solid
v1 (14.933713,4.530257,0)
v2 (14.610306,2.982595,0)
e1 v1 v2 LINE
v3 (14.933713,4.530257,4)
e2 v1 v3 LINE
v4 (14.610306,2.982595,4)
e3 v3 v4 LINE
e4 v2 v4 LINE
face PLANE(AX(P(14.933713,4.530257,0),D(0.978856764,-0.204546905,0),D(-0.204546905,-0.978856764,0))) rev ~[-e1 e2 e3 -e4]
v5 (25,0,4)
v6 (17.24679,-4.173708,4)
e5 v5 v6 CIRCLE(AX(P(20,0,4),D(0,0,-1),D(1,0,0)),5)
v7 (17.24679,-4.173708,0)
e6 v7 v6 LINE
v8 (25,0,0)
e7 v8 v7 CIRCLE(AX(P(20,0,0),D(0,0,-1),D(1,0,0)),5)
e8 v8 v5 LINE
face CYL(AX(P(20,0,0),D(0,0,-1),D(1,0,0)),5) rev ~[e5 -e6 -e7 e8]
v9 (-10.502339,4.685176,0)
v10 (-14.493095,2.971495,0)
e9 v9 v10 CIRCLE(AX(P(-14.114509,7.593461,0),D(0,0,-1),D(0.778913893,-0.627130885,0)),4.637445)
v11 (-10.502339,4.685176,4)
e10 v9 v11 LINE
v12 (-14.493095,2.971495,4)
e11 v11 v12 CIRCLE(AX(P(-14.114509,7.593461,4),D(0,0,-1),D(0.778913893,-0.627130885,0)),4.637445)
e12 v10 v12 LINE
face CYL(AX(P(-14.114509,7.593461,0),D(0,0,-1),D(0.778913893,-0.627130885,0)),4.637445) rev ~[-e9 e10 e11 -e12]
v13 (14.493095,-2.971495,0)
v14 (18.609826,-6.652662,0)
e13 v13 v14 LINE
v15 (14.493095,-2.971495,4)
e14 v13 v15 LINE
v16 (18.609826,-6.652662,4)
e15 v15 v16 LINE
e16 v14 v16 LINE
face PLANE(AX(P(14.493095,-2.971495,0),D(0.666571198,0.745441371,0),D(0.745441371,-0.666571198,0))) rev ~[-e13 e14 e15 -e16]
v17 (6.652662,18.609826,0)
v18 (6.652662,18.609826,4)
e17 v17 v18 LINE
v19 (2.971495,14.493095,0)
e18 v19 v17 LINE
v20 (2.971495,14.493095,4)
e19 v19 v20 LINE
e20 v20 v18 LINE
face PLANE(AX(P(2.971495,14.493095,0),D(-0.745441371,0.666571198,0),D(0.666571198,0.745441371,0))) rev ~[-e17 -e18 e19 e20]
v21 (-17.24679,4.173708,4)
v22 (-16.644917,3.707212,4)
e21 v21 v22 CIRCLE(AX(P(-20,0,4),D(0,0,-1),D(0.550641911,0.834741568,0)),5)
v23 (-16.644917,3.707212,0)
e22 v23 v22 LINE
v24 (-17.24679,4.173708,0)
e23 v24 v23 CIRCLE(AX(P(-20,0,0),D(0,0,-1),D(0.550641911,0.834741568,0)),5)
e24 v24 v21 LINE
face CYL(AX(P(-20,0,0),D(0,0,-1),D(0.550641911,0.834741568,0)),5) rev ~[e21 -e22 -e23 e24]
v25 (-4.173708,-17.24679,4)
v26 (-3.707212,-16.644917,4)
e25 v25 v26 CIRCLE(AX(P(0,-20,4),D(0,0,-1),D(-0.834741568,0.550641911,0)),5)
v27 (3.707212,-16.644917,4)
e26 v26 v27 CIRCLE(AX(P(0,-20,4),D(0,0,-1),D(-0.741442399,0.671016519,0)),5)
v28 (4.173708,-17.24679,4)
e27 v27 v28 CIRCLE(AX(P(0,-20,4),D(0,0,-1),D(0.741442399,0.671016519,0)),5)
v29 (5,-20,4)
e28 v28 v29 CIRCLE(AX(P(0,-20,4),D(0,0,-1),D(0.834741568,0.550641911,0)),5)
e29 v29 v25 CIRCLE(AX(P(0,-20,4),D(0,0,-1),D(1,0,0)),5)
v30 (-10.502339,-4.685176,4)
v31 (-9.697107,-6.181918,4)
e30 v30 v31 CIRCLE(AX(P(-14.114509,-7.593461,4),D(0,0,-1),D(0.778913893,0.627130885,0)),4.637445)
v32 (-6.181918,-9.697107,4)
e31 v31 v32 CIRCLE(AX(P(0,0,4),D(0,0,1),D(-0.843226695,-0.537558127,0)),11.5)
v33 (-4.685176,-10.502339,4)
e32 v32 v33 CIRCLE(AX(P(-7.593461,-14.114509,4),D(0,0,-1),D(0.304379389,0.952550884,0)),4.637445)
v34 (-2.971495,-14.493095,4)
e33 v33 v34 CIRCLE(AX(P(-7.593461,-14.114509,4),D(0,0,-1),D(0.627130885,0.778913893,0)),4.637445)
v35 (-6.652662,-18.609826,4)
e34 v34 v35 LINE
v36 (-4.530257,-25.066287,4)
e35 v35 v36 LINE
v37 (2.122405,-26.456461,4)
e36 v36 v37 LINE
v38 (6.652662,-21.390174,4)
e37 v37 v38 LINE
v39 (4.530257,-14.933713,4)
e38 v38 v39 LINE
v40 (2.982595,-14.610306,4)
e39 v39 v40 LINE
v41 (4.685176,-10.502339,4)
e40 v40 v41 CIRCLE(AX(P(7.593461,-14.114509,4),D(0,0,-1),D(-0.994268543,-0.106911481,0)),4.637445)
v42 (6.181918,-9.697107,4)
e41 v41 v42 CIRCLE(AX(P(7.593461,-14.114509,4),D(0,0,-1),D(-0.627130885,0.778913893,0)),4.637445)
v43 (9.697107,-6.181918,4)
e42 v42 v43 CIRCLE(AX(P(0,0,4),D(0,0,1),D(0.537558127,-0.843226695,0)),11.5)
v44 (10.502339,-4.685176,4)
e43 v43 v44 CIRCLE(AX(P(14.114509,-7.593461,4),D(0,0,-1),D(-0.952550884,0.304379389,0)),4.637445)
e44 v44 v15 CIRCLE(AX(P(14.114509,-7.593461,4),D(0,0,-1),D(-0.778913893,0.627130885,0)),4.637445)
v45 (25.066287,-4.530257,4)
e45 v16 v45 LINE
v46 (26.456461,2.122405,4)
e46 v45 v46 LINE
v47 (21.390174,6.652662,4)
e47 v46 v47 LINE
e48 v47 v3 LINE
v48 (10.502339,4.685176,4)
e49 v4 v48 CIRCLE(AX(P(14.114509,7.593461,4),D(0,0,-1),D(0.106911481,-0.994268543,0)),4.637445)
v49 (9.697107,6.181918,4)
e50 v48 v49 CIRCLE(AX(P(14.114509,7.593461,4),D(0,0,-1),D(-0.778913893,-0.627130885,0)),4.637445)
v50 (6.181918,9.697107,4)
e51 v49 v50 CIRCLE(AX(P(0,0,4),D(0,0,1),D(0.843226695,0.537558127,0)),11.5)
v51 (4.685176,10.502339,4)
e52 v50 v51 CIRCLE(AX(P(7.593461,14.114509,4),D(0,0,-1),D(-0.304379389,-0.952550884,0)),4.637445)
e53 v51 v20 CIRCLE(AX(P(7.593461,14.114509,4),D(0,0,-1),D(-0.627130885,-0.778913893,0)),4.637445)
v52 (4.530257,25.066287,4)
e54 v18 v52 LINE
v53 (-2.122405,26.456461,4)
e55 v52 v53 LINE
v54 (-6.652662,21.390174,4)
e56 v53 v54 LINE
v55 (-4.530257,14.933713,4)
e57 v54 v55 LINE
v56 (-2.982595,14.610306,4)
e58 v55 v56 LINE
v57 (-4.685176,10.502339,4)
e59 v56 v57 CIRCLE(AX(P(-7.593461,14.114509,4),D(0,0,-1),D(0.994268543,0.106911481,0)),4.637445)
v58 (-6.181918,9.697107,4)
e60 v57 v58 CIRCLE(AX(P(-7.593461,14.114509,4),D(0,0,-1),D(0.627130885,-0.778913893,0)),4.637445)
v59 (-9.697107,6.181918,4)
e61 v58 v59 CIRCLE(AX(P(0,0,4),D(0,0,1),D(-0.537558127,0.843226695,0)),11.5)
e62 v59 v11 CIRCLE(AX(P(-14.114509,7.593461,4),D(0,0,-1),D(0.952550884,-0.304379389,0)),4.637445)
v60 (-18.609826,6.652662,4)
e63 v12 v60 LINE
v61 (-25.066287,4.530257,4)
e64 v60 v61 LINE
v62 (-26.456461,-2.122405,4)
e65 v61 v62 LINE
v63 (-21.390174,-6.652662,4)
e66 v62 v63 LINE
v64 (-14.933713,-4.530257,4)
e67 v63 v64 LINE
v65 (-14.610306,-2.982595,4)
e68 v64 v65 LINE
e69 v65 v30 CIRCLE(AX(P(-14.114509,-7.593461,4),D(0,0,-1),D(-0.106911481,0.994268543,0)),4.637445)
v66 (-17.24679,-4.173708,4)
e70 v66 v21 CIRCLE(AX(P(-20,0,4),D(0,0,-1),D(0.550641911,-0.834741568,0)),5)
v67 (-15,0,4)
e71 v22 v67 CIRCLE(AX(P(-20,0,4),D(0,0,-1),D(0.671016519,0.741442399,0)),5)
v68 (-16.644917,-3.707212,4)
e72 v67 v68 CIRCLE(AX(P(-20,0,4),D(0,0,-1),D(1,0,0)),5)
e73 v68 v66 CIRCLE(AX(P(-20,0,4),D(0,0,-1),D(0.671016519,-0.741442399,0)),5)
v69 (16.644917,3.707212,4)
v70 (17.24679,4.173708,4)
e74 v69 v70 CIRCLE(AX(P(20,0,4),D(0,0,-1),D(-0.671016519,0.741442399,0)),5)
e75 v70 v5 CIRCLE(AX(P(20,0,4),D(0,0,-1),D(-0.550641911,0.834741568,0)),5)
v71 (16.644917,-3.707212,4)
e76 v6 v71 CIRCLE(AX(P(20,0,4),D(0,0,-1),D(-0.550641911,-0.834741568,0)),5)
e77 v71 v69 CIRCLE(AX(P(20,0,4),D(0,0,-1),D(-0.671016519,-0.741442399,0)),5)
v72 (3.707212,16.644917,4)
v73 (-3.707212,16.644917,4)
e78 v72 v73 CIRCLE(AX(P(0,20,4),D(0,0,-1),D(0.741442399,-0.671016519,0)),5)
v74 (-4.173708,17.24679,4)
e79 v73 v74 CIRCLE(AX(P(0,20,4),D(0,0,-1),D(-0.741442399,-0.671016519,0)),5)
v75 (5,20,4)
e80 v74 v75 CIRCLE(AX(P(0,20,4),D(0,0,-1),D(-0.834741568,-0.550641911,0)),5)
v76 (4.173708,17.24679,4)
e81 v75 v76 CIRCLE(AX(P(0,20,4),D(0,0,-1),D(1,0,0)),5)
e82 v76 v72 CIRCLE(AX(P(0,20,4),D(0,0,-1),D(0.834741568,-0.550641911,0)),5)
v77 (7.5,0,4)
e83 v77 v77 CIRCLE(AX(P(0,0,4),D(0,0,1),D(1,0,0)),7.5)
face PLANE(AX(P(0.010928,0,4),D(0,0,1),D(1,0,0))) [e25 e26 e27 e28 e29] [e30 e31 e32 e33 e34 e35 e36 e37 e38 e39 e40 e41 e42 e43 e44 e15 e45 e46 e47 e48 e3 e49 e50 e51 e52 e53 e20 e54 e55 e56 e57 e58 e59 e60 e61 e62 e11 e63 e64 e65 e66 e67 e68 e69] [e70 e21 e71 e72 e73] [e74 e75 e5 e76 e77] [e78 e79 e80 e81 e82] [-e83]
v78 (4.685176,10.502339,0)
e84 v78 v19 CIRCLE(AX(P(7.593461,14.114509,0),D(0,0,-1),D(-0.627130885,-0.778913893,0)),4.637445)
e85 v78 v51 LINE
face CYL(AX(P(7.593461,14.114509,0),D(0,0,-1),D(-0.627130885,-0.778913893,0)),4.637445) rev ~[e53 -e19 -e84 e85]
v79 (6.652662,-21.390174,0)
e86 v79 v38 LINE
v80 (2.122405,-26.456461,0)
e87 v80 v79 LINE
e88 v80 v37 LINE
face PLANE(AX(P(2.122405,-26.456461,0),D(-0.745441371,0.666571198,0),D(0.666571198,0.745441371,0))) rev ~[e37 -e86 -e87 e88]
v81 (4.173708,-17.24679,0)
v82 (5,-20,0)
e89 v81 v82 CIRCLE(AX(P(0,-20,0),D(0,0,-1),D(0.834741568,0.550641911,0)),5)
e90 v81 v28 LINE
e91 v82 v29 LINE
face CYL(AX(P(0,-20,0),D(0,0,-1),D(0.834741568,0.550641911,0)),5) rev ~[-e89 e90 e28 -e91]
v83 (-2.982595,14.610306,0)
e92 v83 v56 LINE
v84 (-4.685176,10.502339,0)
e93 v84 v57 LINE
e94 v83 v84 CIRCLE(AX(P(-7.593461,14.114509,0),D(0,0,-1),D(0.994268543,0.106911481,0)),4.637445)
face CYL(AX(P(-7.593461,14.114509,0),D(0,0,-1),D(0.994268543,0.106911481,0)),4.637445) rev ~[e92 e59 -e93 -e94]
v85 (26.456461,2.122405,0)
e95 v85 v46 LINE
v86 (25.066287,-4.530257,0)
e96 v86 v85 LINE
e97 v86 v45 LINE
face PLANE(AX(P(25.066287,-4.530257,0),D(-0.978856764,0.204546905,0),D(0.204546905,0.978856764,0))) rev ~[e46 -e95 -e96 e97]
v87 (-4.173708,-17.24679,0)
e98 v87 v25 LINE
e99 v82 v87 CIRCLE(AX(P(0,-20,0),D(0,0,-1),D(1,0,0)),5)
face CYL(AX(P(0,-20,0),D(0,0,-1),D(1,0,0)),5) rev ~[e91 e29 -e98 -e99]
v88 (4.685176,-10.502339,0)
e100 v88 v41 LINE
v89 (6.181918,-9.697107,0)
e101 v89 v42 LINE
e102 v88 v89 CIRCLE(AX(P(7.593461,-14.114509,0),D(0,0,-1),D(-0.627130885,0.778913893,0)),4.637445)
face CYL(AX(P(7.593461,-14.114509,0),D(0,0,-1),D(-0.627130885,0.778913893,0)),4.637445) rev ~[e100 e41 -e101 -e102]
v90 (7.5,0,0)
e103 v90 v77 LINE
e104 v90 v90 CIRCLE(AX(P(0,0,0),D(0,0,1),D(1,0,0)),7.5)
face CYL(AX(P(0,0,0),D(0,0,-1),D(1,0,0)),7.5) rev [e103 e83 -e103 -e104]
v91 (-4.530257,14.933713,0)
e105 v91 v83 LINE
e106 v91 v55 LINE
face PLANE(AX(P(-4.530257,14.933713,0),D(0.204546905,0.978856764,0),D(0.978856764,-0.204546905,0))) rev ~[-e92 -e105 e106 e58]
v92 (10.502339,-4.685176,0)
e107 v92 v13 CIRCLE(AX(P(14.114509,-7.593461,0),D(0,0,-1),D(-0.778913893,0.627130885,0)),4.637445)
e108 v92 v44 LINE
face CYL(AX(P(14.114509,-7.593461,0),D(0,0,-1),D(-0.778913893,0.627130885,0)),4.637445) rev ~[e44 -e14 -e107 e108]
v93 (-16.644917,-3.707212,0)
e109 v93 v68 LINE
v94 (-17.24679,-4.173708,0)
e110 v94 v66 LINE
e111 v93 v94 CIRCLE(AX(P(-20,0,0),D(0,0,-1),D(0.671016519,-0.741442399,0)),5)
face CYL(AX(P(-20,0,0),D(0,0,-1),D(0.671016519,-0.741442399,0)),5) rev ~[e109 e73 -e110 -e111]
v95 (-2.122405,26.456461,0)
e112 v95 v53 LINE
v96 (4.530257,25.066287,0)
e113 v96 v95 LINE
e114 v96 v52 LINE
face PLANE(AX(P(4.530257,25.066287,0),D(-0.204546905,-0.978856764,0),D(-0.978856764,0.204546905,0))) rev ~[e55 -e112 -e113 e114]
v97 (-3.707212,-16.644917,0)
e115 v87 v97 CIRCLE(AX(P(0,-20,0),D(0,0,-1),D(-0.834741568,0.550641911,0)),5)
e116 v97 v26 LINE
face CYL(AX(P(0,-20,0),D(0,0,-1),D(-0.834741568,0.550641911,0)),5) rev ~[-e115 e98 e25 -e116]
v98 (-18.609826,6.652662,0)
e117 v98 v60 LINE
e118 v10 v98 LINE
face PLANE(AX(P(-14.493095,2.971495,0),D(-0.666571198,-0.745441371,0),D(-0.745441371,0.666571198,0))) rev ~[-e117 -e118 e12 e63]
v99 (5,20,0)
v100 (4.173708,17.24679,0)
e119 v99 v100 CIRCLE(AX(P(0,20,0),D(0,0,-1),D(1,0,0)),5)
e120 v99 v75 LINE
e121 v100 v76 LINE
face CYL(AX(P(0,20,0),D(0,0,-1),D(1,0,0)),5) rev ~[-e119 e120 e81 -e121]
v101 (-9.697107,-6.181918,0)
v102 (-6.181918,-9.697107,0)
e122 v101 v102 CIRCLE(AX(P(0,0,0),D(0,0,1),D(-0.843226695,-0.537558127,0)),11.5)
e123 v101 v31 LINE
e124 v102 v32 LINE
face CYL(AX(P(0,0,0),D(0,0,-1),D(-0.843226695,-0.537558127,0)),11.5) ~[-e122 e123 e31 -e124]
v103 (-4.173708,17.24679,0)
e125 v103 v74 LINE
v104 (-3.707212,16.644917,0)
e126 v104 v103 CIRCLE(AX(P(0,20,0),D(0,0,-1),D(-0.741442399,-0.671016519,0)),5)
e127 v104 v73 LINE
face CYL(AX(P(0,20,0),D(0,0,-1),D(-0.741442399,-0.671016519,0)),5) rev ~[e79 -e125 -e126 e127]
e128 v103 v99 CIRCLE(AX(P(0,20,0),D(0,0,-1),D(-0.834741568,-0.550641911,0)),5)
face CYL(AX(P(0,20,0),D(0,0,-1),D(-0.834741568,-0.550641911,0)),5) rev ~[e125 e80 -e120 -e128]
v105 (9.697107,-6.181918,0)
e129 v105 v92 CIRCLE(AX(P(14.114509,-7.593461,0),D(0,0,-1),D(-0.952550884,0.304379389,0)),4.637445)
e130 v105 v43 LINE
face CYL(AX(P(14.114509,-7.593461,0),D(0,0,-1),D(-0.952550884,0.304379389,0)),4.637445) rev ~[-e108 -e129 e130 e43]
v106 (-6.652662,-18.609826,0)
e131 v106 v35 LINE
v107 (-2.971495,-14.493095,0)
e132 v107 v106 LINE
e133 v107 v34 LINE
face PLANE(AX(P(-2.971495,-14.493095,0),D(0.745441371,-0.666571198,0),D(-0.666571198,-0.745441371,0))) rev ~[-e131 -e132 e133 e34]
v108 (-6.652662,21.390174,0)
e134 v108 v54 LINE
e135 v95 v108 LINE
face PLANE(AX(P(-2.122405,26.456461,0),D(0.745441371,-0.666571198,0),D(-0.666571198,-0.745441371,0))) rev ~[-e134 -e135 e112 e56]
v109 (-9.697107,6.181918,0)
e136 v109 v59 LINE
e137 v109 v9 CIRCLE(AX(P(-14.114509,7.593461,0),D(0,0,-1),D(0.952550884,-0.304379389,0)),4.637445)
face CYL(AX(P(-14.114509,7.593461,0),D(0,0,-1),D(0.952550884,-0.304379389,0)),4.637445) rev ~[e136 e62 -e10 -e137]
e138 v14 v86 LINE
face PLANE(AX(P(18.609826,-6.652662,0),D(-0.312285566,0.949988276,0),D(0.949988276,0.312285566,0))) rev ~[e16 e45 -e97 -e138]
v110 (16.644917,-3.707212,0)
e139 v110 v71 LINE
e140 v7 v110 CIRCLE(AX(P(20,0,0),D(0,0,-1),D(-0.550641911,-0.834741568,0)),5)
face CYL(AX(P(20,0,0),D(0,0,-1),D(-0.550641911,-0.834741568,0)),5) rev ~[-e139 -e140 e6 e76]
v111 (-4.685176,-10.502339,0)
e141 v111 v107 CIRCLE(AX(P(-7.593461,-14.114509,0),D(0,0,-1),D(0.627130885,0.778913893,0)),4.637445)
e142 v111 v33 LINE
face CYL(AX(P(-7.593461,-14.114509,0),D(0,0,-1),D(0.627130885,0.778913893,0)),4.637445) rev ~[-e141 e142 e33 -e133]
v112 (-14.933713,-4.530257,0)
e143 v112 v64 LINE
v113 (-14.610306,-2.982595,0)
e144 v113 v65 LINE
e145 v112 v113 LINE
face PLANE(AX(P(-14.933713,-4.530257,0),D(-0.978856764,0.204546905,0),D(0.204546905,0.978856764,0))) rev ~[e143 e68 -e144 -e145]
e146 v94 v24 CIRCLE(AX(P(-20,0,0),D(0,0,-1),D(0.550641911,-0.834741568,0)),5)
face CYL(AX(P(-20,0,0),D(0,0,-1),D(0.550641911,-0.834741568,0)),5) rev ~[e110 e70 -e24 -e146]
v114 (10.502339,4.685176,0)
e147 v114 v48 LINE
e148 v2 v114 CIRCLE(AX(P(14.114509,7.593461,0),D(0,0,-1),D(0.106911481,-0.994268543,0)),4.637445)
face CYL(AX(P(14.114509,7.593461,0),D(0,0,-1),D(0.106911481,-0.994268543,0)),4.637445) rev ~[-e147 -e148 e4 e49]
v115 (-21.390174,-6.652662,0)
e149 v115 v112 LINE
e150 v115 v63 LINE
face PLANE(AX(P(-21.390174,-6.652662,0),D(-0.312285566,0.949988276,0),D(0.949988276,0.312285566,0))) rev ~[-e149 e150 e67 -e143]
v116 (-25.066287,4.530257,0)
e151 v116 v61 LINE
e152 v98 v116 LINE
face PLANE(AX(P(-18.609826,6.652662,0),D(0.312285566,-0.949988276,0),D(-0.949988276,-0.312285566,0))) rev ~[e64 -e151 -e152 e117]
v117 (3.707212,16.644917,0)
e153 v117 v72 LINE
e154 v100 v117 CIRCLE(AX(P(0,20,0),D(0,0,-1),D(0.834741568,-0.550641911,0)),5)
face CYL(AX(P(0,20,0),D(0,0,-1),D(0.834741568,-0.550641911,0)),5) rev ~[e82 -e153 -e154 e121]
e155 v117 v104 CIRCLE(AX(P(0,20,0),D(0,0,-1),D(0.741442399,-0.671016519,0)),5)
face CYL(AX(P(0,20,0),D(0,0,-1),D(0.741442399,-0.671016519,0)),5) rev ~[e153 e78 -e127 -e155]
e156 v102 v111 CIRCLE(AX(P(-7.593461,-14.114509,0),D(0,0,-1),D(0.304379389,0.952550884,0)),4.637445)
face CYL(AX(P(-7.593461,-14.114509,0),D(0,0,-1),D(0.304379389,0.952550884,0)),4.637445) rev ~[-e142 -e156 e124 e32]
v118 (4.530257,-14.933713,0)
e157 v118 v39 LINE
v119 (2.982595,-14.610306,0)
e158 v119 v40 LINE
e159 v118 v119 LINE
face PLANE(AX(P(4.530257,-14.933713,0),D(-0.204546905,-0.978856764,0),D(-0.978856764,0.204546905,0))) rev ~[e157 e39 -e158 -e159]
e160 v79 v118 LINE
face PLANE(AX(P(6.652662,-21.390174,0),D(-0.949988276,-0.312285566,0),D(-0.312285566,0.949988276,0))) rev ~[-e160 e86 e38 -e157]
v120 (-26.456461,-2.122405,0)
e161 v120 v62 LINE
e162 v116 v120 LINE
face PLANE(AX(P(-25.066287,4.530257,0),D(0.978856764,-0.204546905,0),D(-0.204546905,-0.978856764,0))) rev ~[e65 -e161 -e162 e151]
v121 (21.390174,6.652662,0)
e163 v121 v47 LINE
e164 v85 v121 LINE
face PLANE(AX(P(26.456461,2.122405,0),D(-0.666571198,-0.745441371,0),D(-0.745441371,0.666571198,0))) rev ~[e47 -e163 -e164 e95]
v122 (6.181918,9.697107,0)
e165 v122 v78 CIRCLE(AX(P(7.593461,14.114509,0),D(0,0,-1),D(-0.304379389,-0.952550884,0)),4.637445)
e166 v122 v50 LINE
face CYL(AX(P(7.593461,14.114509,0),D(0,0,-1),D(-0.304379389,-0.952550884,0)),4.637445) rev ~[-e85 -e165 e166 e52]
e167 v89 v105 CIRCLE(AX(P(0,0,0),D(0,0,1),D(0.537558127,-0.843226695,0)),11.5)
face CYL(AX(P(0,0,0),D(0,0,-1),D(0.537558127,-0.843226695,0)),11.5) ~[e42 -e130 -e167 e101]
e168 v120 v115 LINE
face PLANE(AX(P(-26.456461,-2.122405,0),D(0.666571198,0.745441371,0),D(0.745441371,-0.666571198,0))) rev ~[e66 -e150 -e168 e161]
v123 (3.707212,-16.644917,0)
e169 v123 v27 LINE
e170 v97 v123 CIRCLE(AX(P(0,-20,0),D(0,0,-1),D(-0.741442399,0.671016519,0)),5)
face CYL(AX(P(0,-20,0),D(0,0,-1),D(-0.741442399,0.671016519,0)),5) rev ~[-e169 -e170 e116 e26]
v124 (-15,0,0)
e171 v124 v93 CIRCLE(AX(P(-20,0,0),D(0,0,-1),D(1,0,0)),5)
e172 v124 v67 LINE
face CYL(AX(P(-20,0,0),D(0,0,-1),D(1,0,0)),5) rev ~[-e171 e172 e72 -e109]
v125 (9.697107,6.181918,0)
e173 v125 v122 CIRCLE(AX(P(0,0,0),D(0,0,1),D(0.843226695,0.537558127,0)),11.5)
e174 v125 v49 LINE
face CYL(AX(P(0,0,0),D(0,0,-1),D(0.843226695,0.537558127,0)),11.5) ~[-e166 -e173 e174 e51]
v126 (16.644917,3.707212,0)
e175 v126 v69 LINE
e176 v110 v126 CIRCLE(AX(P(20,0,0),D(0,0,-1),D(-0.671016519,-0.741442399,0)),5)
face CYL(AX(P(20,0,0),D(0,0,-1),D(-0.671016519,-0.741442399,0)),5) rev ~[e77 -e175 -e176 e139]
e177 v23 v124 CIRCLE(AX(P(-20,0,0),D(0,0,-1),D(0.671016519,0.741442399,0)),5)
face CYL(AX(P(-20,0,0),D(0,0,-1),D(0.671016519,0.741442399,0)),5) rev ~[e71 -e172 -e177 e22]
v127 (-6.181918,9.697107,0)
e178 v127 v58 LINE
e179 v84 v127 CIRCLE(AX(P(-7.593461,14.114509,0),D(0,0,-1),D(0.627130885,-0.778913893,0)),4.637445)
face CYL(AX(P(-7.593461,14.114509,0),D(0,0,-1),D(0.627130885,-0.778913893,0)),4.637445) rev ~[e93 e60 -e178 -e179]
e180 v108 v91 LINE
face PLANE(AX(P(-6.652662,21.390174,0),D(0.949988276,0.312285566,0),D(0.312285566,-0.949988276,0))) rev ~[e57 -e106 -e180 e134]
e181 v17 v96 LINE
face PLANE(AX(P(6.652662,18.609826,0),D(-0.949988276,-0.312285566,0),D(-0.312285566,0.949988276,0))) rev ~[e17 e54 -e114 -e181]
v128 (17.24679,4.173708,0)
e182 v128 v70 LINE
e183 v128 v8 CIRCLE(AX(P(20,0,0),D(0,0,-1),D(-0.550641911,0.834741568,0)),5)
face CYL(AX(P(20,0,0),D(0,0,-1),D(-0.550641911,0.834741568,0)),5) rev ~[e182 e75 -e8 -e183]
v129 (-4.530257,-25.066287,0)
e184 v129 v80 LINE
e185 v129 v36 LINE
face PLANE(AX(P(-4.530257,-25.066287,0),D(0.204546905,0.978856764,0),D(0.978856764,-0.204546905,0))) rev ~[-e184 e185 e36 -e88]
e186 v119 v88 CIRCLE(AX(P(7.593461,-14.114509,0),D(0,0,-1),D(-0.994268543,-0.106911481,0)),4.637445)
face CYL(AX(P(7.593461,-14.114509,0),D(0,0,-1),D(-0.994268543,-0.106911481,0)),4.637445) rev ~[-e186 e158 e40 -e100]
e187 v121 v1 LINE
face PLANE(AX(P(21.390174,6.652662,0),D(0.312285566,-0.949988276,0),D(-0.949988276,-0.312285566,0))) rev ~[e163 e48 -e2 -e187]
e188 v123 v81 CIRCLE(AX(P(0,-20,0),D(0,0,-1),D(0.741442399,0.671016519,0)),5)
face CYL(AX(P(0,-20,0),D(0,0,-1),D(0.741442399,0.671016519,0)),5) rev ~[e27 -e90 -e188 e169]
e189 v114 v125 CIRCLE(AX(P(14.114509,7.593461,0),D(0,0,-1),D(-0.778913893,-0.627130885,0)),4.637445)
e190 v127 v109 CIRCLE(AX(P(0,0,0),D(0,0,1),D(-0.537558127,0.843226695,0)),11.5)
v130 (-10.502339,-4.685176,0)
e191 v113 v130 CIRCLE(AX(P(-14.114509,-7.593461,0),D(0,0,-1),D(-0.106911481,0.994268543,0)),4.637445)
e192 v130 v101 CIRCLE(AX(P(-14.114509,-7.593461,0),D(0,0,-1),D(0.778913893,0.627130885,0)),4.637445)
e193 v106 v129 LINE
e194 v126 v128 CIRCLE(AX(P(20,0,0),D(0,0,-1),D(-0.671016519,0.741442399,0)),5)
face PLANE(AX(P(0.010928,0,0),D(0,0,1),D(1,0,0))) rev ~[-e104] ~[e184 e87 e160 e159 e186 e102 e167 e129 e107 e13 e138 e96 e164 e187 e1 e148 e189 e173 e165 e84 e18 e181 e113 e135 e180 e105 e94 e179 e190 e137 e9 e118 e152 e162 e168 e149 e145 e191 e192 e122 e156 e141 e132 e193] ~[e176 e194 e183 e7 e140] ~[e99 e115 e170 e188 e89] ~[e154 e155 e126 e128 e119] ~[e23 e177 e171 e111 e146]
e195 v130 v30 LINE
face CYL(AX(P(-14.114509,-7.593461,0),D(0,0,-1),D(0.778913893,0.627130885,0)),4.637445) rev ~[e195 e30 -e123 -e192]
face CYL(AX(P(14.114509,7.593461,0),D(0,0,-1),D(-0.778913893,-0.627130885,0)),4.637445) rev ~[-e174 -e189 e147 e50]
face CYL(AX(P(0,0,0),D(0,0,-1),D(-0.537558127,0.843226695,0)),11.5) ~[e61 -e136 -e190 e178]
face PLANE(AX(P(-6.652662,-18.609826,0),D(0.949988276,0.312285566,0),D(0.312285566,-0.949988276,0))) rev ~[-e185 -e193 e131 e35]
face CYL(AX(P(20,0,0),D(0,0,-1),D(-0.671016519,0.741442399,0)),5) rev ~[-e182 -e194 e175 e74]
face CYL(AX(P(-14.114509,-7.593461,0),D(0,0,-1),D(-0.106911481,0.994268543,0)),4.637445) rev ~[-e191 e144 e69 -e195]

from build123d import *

# Parameters (mm, degrees)
F0_R     = 7.5
F1_DEPTH = 4


with BuildPart() as f1:
    # F0 (on Top) → F1 (new body)
    with BuildSketch(Plane.XY):
        with BuildLine():
            ThreePointArc((10.5023390129, 4.6851761182), (10.0305689983, 5.3963431452), (9.6971069971, 6.1819184634))
            ThreePointArc((9.6971069971, 6.1819184634), (8.1317279836, 8.1317279836), (6.1819184634, 9.6971069971))
            ThreePointArc((6.1819184634, 9.6971069971), (5.3963431452, 10.0305689983), (4.6851761182, 10.5023390129))
            ThreePointArc((4.6851761182, 10.5023390129), (0, 11.5), (-4.6851761182, 10.5023390129))
            ThreePointArc((-4.6851761182, 10.5023390129), (-5.3963431452, 10.0305689983), (-6.1819184634, 9.6971069971))
            ThreePointArc((-6.1819184634, 9.6971069971), (-8.1317279836, 8.1317279836), (-9.6971069971, 6.1819184634))
            ThreePointArc((-9.6971069971, 6.1819184634), (-10.0305689983, 5.3963431452), (-10.5023390129, 4.6851761182))
            ThreePointArc((-10.5023390129, 4.6851761182), (-11.5, 0), (-10.5023390129, -4.6851761182))
            ThreePointArc((-10.5023390129, -4.6851761182), (-10.0305689983, -5.3963431452), (-9.6971069971, -6.1819184634))
            ThreePointArc((-9.6971069971, -6.1819184634), (-8.1317279836, -8.1317279836), (-6.1819184634, -9.6971069971))
            ThreePointArc((-6.1819184634, -9.6971069971), (-5.3963431452, -10.0305689983), (-4.6851761182, -10.5023390129))
            ThreePointArc((-4.6851761182, -10.5023390129), (0, -11.5), (4.6851761182, -10.5023390129))
            ThreePointArc((4.6851761182, -10.5023390129), (5.3963431452, -10.0305689983), (6.1819184634, -9.6971069971))
            ThreePointArc((6.1819184634, -9.6971069971), (8.1317279836, -8.1317279836), (9.6971069971, -6.1819184634))
            ThreePointArc((9.6971069971, -6.1819184634), (10.0305689983, -5.3963431452), (10.5023390129, -4.6851761182))
            ThreePointArc((10.5023390129, -4.6851761182), (11.2478197587, -2.3951097419), (11.5, 0))
            ThreePointArc((11.5, 0), (11.2478197587, 2.3951097419), (10.5023390129, 4.6851761182))
        make_face()
        Circle(F0_R, mode=Mode.SUBTRACT)
        with BuildLine():
            ThreePointArc((14.6103055623, 2.982595382), (12.338941223, 3.3093913031), (10.5023390129, 4.6851761182))
            ThreePointArc((10.5023390129, 4.6851761182), (11.2478197587, 2.3951097419), (11.5, 0))
            ThreePointArc((11.5, 0), (11.2478197587, -2.3951097419), (10.5023390129, -4.6851761182))
            ThreePointArc((10.5023390129, -4.6851761182), (12.2847026286, -3.3322754018), (14.4930952607, -2.9714951504))
            ThreePointArc((14.4930952607, -2.9714951504), (15.6148030882, -3.2054073782), (16.6449174053, -3.7072119959))
            ThreePointArc((16.6449174053, -3.7072119959), (15, 0), (16.6449174053, 3.7072119959))
            ThreePointArc((16.6449174053, 3.7072119959), (15.6703838257, 3.2248055408), (14.6103055623, 2.982595382))
        make_face()
        with BuildLine():
            ThreePointArc((-4.6851761182, 10.5023390129), (0, 11.5), (4.6851761182, 10.5023390129))
            ThreePointArc((4.6851761182, 10.5023390129), (3.3322754018, 12.2847026286), (2.9714951504, 14.4930952607))
            ThreePointArc((2.9714951504, 14.4930952607), (3.2054073782, 15.6148030882), (3.7072119959, 16.6449174053))
            ThreePointArc((3.7072119959, 16.6449174053), (0, 15), (-3.7072119959, 16.6449174053))
            ThreePointArc((-3.7072119959, 16.6449174053), (-3.2248055408, 15.6703838257), (-2.982595382, 14.6103055623))
            ThreePointArc((-2.982595382, 14.6103055623), (-3.3093913031, 12.338941223), (-4.6851761182, 10.5023390129))
        make_face()
        with BuildLine():
            Line((14.9337128596, 4.5302571293), (14.6103055623, 2.982595382))
            ThreePointArc((14.6103055623, 2.982595382), (15.6703838257, 3.2248055408), (16.6449174053, 3.7072119959))
            ThreePointArc((16.6449174053, 3.7072119959), (16.936960195, 3.9519346089), (17.2467904427, 4.17370784))
            ThreePointArc((17.2467904427, 4.17370784), (22.3700160562, 4.4026155741), (25, 0))
            ThreePointArc((25, 0), (22.3700160562, -4.4026155741), (17.2467904427, -4.17370784))
            ThreePointArc((17.2467904427, -4.17370784), (16.936960195, -3.9519346089), (16.6449174053, -3.7072119959))
            ThreePointArc((16.6449174053, -3.7072119959), (15.6148030882, -3.2054073782), (14.4930952607, -2.9714951504))
            Line((14.4930952607, -2.9714951504), (18.6098258106, -6.6526619311))
            Line((18.6098258106, -6.6526619311), (25.0662871404, -4.5302571293))
            Line((25.0662871404, -4.5302571293), (26.4564613299, 2.1224048018))
            Line((26.4564613299, 2.1224048018), (21.3901741894, 6.6526619311))
            Line((21.3901741894, 6.6526619311), (14.9337128596, 4.5302571293))
        make_face()
        with BuildLine():
            ThreePointArc((3.7072119959, 16.6449174053), (3.2054073782, 15.6148030882), (2.9714951504, 14.4930952607))
            Line((2.9714951504, 14.4930952607), (6.6526619311, 18.6098258106))
            Line((6.6526619311, 18.6098258106), (4.5302571293, 25.0662871404))
            Line((4.5302571293, 25.0662871404), (-2.1224048018, 26.4564613299))
            Line((-2.1224048018, 26.4564613299), (-6.6526619311, 21.3901741894))
            Line((-6.6526619311, 21.3901741894), (-4.5302571293, 14.9337128596))
            Line((-4.5302571293, 14.9337128596), (-2.982595382, 14.6103055623))
            ThreePointArc((-2.982595382, 14.6103055623), (-3.2248055408, 15.6703838257), (-3.7072119959, 16.6449174053))
            ThreePointArc((-3.7072119959, 16.6449174053), (-3.9519346089, 16.936960195), (-4.17370784, 17.2467904427))
            ThreePointArc((-4.17370784, 17.2467904427), (-1.4372649025, 24.7889737523), (5, 20))
            ThreePointArc((5, 20), (4.7889737523, 18.5627350975), (4.17370784, 17.2467904427))
            ThreePointArc((4.17370784, 17.2467904427), (3.9519346089, 16.936960195), (3.7072119959, 16.6449174053))
        make_face()
        with BuildLine():
            ThreePointArc((-10.5023390129, -4.6851761182), (-11.5, 0), (-10.5023390129, 4.6851761182))
            ThreePointArc((-10.5023390129, 4.6851761182), (-12.2847026286, 3.3322754018), (-14.4930952607, 2.9714951504))
            ThreePointArc((-14.4930952607, 2.9714951504), (-15.6148030882, 3.2054073782), (-16.6449174053, 3.7072119959))
            ThreePointArc((-16.6449174053, 3.7072119959), (-15.4296929549, 2.0278790677), (-15, 0))
            ThreePointArc((-15, 0), (-15.4296929549, -2.0278790677), (-16.6449174053, -3.7072119959))
            ThreePointArc((-16.6449174053, -3.7072119959), (-15.6703838257, -3.2248055408), (-14.6103055623, -2.982595382))
            ThreePointArc((-14.6103055623, -2.982595382), (-12.338941223, -3.3093913031), (-10.5023390129, -4.6851761182))
        make_face()
        with BuildLine():
            ThreePointArc((2.982595382, -14.6103055623), (3.3093913031, -12.338941223), (4.6851761182, -10.5023390129))
            ThreePointArc((4.6851761182, -10.5023390129), (0, -11.5), (-4.6851761182, -10.5023390129))
            ThreePointArc((-4.6851761182, -10.5023390129), (-3.3322754018, -12.2847026286), (-2.9714951504, -14.4930952607))
            ThreePointArc((-2.9714951504, -14.4930952607), (-3.2054073782, -15.6148030882), (-3.7072119959, -16.6449174053))
            ThreePointArc((-3.7072119959, -16.6449174053), (0, -15), (3.7072119959, -16.6449174053))
            ThreePointArc((3.7072119959, -16.6449174053), (3.2248055408, -15.6703838257), (2.982595382, -14.6103055623))
        make_face()
        with BuildLine():
            ThreePointArc((-16.6449174053, 3.7072119959), (-15.6148030882, 3.2054073782), (-14.4930952607, 2.9714951504))
            Line((-14.4930952607, 2.9714951504), (-18.6098258106, 6.6526619311))
            Line((-18.6098258106, 6.6526619311), (-25.0662871404, 4.5302571293))
            Line((-25.0662871404, 4.5302571293), (-26.4564613299, -2.1224048018))
            Line((-26.4564613299, -2.1224048018), (-21.3901741894, -6.6526619311))
            Line((-21.3901741894, -6.6526619311), (-14.9337128596, -4.5302571293))
            Line((-14.9337128596, -4.5302571293), (-14.6103055623, -2.982595382))
            ThreePointArc((-14.6103055623, -2.982595382), (-15.6703838257, -3.2248055408), (-16.6449174053, -3.7072119959))
            ThreePointArc((-16.6449174053, -3.7072119959), (-16.936960195, -3.9519346089), (-17.2467904427, -4.17370784))
            ThreePointArc((-17.2467904427, -4.17370784), (-25, 0), (-17.2467904427, 4.17370784))
            ThreePointArc((-17.2467904427, 4.17370784), (-16.936960195, 3.9519346089), (-16.6449174053, 3.7072119959))
        make_face()
        with BuildLine():
            Line((4.5302571293, -14.9337128596), (2.982595382, -14.6103055623))
            ThreePointArc((2.982595382, -14.6103055623), (3.2248055408, -15.6703838257), (3.7072119959, -16.6449174053))
            ThreePointArc((3.7072119959, -16.6449174053), (3.9519346089, -16.936960195), (4.17370784, -17.2467904427))
            ThreePointArc((4.17370784, -17.2467904427), (4.7889737523, -18.5627350975), (5, -20))
            ThreePointArc((5, -20), (-1.4372649025, -24.7889737523), (-4.17370784, -17.2467904427))
            ThreePointArc((-4.17370784, -17.2467904427), (-3.9519346089, -16.936960195), (-3.7072119959, -16.6449174053))
            ThreePointArc((-3.7072119959, -16.6449174053), (-3.2054073782, -15.6148030882), (-2.9714951504, -14.4930952607))
            Line((-2.9714951504, -14.4930952607), (-6.6526619311, -18.6098258106))
            Line((-6.6526619311, -18.6098258106), (-4.5302571293, -25.0662871404))
            Line((-4.5302571293, -25.0662871404), (2.1224048018, -26.4564613299))
            Line((2.1224048018, -26.4564613299), (6.6526619311, -21.3901741894))
            Line((6.6526619311, -21.3901741894), (4.5302571293, -14.9337128596))
        make_face()
    extrude(amount=F1_DEPTH)


solid = f1.part
